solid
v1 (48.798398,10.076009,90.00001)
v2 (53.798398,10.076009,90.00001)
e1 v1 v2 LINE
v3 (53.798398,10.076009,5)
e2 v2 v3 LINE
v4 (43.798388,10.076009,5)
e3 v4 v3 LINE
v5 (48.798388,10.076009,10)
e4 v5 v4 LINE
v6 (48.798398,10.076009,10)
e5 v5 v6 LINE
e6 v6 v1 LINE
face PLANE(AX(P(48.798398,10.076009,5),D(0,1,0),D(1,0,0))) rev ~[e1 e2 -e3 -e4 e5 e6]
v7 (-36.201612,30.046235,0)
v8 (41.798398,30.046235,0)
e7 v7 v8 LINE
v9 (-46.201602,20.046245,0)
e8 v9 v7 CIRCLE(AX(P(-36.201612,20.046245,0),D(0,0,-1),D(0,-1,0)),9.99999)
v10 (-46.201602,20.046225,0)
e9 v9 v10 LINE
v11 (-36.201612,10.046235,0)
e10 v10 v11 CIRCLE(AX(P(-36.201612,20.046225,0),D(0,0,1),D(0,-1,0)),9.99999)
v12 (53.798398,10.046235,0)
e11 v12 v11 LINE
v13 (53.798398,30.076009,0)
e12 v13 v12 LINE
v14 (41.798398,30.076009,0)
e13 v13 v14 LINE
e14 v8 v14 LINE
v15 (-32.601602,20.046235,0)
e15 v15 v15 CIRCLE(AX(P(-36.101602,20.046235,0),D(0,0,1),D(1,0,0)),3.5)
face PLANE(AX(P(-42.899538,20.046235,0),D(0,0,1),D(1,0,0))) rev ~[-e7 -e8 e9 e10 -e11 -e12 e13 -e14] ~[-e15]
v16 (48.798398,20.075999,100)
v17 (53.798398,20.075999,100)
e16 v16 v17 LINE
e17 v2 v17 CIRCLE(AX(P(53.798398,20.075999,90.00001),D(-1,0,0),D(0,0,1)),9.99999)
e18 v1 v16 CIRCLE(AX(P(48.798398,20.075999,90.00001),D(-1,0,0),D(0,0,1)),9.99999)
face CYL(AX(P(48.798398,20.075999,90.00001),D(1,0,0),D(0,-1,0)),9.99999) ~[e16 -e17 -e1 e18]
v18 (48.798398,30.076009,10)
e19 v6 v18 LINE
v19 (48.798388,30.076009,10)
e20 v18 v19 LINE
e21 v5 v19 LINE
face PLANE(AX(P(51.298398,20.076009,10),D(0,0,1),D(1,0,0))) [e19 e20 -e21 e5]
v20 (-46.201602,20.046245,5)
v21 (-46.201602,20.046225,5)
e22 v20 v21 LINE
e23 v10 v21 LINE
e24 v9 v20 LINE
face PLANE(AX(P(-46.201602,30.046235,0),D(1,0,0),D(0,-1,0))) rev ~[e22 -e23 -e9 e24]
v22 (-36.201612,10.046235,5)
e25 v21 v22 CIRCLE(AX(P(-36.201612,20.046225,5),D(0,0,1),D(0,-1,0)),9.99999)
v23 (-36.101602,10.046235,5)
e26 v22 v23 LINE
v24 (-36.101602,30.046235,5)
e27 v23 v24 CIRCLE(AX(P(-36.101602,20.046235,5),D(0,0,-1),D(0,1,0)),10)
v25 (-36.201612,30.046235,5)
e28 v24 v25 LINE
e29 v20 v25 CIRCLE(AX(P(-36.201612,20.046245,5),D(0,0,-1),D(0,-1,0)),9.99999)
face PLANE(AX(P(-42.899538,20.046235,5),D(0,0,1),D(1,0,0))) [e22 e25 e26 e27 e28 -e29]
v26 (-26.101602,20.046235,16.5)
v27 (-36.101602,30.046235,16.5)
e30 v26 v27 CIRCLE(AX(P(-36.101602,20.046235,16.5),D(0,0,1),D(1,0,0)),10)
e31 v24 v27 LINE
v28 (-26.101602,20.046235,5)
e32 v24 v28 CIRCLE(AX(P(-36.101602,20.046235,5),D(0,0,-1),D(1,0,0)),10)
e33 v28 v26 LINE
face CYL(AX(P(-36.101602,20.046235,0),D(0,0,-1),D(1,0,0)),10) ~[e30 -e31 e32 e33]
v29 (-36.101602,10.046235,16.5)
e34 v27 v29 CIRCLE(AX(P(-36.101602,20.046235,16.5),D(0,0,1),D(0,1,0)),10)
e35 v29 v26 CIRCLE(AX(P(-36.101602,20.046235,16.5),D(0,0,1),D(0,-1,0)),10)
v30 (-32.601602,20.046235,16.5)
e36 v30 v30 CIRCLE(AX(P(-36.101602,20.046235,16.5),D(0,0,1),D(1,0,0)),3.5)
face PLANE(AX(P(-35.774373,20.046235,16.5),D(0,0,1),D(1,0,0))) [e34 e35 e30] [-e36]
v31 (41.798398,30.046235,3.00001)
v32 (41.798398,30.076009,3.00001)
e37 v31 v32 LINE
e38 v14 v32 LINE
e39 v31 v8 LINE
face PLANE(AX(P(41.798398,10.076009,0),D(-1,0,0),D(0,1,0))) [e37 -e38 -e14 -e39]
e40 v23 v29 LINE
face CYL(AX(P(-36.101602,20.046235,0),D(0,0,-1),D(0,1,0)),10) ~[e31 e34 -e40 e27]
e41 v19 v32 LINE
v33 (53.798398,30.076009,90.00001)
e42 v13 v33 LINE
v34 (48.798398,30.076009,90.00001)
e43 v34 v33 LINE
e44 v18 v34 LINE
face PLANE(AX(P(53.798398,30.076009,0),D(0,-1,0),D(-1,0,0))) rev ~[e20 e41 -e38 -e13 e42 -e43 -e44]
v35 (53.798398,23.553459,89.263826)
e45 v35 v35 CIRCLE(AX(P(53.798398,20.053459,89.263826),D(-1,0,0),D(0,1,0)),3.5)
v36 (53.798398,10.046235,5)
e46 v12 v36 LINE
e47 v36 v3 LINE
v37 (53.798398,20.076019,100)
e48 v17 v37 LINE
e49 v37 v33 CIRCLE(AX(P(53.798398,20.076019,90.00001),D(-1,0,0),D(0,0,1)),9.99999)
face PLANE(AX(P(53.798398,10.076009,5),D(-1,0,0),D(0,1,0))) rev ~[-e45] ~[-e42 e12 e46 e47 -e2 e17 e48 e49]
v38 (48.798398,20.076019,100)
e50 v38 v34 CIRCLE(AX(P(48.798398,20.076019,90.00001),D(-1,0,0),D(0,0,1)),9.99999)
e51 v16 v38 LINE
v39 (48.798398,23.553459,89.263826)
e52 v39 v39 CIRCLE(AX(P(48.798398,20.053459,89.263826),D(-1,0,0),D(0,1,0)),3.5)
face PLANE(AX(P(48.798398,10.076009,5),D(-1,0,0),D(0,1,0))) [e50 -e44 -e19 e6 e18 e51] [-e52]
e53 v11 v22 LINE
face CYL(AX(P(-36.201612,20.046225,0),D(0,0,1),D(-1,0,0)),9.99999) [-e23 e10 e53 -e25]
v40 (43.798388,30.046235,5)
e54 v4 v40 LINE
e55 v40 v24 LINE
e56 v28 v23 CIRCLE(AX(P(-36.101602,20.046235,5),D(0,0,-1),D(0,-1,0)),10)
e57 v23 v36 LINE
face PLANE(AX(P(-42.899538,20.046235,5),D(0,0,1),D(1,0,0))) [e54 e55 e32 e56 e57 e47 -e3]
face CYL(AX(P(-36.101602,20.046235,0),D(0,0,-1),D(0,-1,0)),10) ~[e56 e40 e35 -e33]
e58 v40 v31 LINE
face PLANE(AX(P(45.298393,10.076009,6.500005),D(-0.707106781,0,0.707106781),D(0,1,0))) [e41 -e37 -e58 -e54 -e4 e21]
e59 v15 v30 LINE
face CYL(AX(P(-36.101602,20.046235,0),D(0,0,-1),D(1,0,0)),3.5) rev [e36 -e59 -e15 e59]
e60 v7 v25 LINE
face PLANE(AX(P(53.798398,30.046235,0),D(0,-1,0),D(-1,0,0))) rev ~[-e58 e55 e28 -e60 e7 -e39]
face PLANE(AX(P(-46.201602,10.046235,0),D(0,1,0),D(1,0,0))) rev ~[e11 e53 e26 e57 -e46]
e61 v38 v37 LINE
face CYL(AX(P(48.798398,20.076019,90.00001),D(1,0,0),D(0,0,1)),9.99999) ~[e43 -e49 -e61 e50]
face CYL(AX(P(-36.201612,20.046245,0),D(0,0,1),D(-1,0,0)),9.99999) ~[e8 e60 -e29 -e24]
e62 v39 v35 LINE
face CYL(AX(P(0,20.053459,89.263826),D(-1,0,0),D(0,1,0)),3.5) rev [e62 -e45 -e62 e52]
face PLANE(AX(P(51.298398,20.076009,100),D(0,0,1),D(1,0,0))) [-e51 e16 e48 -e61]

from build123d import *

# Parameters (mm, degrees)
F0_R     = 3.5
F1_DEPTH = 5
F2_R     = 9.99999
F4_START = 5
F3_W     = 5
F3_H     = 20
F4_DEPTH = 95
F5_R     = 3.5
F6_DEPTH = 79.3
F7_R     = 9.99999
F8_DEPTH = 16.5
F3_W_2   = 7
F9_DEPTH = 10
F10_SIZE = 6.99999


# Not quite as in the source:
# - a fillet or chamfer is up to 0.001 mm smaller than in the source, because OpenCascade refuses the exact size


with BuildPart() as f1:
    # F0 (on Top) → F1 (new body)
    with BuildSketch(Plane.XY):
        with BuildLine():
            Line((-36.1016022205, 30.0462352857), (-46.2016022205, 30.0462352857))
            Line((-46.2016022205, 30.0462352857), (-46.2016022205, 10.0462352857))
            Line((-46.2016022205, 10.0462352857), (-36.1016022205, 10.0462352857))
            ThreePointArc((-36.1016022205, 10.0462352857), (-46.1016022205, 20.0462352857), (-36.1016022205, 30.0462352857))
        make_face()
        with BuildLine():
            Line((53.7983977795, 30.0462352857), (-36.1016022205, 30.0462352857))
            ThreePointArc((-36.1016022205, 30.0462352857), (-29.0305344087, 27.1173030976), (-26.1016022205, 20.0462352857))
            ThreePointArc((-26.1016022205, 20.0462352857), (-29.0305344087, 12.9751674738), (-36.1016022205, 10.0462352857))
            Line((-36.1016022205, 10.0462352857), (53.7983977795, 10.0462352857))
            Line((53.7983977795, 10.0462352857), (53.7983977795, 30.0462352857))
        make_face()
        with BuildLine():
            ThreePointArc((-26.1016022205, 20.0462352857), (-29.0305344087, 27.1173030976), (-36.1016022205, 30.0462352857))
            ThreePointArc((-36.1016022205, 30.0462352857), (-46.1016022205, 20.0462352857), (-36.1016022205, 10.0462352857))
            ThreePointArc((-36.1016022205, 10.0462352857), (-29.0305344087, 12.9751674738), (-26.1016022205, 20.0462352857))
        make_face()
        with Locations((-36.1016022205, 20.0462352857)):
            Circle(F0_R, mode=Mode.SUBTRACT)
    extrude(amount=F1_DEPTH)

    # F2 (radius 10 in the source; OpenCascade refuses exactly that, so slightly less here)
    f2_edges = [f1.edges().sort_by_distance(p)[0] for p in [
        (-46.201602, 30.046235, 2.5),
        (-46.201602, 10.046235, 2.5),
    ]]
    fillet(f2_edges, radius=F2_R)

    # F3 (on Top) → F4 (join)
    with BuildSketch(Plane.XY.offset(F4_START)):
        with Locations((51.2983977795, 20.0760087371)):
            Rectangle(F3_W, F3_H)
    extrude(amount=F4_DEPTH)

    # F5 (on Right) → F6 (cut)
    with BuildSketch(Plane.YZ):
        with Locations((20.0534593314, 89.2638255358)):
            Circle(F5_R)
    extrude(amount=F6_DEPTH, mode=Mode.SUBTRACT)

    # F7 (radius 10 in the source; OpenCascade refuses exactly that, so slightly less here)
    f7_edges = [f1.edges().sort_by_distance(p)[0] for p in [
        (51.298398, 10.076009, 100),
        (51.298398, 30.076009, 100),
    ]]
    fillet(f7_edges, radius=F7_R)

    # F0 (on Top) → F8 (join)
    with BuildSketch(Plane.XY):
        with BuildLine():
            ThreePointArc((-26.1016022205, 20.0462352857), (-29.0305344087, 27.1173030976), (-36.1016022205, 30.0462352857))
            ThreePointArc((-36.1016022205, 30.0462352857), (-46.1016022205, 20.0462352857), (-36.1016022205, 10.0462352857))
            ThreePointArc((-36.1016022205, 10.0462352857), (-29.0305344087, 12.9751674738), (-26.1016022205, 20.0462352857))
        make_face()
        with Locations((-36.1016022205, 20.0462352857)):
            Circle(F0_R, mode=Mode.SUBTRACT)
    extrude(amount=F8_DEPTH)

    # F3 (on Top) → F9 (join)
    with BuildSketch(Plane.XY):
        with Locations((51.2983977795, 20.0760087371)):
            Rectangle(F3_W, F3_H)
        with Locations((45.2983977795, 20.0760087371)):
            Rectangle(F3_W_2, F3_H)
    extrude(amount=F9_DEPTH)

    # F10 (size 7 in the source; OpenCascade refuses exactly that, so slightly less here)
    f10_edges = [f1.edges().sort_by_distance(p)[0] for p in [
        (41.798398, 20.076009, 10),
    ]]
    chamfer(f10_edges, length=F10_SIZE)


solid = f1.part
